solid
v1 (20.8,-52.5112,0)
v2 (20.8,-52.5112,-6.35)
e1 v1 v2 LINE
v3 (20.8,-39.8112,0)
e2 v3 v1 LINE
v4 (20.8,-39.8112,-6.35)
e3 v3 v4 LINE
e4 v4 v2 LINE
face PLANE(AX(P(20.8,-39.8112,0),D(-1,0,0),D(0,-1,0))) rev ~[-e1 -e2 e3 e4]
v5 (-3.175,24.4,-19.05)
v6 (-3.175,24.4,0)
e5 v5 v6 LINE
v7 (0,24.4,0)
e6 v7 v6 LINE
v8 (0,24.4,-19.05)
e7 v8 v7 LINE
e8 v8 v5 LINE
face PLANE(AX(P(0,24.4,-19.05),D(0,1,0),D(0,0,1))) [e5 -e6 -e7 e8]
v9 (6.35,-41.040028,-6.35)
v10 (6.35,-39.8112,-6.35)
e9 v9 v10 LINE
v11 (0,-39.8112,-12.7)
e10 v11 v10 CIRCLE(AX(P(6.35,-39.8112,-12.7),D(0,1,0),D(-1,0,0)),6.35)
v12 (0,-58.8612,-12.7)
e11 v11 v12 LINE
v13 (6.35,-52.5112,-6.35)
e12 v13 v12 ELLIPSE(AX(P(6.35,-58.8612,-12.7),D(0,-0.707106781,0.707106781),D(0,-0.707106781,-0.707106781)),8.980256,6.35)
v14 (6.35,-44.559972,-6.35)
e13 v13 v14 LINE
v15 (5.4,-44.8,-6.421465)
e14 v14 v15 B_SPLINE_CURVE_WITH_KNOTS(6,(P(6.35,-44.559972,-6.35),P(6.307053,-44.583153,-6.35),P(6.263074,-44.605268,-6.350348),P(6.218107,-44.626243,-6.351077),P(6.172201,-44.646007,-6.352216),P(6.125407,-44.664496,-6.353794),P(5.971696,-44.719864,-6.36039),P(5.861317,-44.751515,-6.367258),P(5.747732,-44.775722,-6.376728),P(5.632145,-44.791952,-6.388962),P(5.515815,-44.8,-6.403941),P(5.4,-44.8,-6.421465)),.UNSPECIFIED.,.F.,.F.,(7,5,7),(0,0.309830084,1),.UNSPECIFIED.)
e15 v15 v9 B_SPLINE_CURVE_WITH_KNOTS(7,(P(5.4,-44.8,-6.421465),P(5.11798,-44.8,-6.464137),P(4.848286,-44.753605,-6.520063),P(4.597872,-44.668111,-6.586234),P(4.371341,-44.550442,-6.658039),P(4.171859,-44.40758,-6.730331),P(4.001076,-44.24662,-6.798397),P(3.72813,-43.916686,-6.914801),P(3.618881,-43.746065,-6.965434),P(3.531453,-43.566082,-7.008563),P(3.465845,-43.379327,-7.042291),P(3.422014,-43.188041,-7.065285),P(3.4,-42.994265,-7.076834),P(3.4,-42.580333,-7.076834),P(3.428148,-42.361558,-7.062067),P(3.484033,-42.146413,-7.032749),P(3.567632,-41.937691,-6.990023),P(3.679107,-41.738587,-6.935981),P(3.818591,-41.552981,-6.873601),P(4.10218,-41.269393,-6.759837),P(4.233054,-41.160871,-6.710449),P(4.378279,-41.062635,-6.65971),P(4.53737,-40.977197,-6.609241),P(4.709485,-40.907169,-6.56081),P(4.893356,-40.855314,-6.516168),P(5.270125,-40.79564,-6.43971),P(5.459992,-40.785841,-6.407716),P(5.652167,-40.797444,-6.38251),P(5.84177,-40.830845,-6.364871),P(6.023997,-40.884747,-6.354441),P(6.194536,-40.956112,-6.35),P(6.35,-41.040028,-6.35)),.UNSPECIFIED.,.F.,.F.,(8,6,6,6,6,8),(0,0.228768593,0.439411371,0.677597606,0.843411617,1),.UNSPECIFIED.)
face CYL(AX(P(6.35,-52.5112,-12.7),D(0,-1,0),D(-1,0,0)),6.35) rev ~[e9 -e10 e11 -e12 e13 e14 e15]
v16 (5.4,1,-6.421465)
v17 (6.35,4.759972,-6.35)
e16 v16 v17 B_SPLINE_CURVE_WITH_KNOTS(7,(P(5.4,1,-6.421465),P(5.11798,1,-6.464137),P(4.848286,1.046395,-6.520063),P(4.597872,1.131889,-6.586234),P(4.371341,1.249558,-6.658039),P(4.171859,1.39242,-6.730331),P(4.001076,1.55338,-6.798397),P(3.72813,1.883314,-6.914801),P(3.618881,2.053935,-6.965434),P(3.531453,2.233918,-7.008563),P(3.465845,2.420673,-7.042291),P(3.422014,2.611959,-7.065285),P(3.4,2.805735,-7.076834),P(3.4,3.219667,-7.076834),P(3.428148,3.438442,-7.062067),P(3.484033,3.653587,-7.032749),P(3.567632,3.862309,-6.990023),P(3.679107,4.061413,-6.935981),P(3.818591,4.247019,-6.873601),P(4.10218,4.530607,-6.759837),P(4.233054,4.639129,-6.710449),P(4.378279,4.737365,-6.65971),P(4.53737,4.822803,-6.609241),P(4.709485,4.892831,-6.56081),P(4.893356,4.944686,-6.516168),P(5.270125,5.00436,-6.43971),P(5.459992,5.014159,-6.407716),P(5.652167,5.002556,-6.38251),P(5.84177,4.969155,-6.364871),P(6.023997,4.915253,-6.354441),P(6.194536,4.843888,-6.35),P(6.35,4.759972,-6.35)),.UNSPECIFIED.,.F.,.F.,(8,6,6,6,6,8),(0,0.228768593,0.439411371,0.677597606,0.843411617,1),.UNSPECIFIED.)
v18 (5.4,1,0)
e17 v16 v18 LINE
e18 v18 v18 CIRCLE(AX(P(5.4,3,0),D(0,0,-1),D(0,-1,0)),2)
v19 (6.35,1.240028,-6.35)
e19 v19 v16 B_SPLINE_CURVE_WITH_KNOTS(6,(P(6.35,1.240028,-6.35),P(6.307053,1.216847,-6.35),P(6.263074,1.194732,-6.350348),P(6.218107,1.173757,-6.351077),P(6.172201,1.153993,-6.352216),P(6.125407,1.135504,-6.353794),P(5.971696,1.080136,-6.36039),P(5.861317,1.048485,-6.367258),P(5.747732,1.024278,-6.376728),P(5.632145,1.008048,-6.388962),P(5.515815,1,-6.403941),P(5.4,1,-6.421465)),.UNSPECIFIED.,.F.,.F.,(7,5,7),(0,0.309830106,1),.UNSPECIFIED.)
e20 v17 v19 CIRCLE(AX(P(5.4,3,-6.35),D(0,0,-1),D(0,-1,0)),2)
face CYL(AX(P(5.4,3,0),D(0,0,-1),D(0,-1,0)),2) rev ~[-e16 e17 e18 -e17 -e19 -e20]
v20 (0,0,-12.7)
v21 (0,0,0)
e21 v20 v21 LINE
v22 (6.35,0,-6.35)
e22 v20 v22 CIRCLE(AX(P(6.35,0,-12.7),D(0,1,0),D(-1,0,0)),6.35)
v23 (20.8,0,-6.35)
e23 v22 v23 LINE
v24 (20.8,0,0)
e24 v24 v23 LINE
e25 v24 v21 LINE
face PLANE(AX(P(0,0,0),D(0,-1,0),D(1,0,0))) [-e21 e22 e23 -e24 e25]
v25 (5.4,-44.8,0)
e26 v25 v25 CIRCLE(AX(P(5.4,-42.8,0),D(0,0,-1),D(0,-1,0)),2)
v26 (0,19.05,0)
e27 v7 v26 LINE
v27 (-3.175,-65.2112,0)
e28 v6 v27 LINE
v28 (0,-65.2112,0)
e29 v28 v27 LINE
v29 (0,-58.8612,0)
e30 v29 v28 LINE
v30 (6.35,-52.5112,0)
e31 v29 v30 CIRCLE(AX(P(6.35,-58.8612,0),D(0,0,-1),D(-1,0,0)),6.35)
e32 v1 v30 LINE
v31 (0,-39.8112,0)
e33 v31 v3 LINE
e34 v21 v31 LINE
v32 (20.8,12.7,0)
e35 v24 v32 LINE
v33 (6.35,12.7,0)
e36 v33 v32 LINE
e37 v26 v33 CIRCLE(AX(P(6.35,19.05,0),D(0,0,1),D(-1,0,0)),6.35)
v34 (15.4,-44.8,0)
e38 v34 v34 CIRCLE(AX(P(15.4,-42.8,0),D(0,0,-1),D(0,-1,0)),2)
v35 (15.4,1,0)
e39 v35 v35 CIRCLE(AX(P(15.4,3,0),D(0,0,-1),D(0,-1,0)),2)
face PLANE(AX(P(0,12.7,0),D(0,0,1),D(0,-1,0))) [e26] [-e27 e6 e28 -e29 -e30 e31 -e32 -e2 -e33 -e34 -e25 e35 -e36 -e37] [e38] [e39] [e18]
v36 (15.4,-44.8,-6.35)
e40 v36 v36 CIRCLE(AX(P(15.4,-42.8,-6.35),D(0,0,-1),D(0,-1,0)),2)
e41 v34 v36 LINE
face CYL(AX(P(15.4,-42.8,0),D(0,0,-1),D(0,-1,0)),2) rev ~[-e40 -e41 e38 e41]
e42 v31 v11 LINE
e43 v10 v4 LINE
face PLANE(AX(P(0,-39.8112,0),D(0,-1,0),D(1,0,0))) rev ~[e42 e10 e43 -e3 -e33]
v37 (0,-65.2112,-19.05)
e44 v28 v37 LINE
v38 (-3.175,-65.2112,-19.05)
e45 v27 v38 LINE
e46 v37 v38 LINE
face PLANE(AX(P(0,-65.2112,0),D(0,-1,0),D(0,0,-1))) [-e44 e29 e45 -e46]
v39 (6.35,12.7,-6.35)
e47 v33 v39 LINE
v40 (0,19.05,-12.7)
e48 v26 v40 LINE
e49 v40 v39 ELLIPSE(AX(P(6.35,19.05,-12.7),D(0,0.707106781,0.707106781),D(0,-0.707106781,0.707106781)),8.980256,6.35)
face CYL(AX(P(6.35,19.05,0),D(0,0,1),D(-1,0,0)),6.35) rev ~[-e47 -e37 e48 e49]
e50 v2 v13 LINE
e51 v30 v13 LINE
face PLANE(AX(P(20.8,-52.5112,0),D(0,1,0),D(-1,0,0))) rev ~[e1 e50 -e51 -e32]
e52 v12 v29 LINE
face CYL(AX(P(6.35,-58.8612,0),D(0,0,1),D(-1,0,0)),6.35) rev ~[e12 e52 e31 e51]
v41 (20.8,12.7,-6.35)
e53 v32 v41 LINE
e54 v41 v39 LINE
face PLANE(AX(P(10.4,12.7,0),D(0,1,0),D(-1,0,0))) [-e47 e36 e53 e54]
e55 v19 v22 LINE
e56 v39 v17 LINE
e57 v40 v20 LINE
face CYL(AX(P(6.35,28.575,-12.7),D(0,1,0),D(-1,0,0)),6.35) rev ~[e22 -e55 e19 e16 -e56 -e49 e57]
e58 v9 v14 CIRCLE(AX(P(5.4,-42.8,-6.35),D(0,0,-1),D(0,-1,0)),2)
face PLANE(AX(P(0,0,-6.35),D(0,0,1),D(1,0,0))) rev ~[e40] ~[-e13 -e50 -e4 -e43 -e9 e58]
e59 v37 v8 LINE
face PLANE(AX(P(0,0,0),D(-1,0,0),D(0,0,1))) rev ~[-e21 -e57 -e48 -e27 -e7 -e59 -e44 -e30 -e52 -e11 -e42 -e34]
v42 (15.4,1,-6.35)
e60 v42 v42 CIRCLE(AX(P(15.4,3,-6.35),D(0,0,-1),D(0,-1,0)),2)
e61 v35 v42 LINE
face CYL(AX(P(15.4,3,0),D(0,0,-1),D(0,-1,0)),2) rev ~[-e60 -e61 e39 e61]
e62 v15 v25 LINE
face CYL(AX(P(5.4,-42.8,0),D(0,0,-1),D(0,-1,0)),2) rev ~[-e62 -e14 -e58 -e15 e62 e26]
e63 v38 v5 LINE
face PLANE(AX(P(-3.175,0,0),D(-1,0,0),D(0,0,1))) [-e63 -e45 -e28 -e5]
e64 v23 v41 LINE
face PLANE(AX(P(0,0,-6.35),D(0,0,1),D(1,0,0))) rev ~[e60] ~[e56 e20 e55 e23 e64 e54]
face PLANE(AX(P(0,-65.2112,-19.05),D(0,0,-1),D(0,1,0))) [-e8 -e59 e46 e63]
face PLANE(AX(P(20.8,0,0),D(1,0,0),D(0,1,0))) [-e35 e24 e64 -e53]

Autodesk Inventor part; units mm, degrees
ref_plane "YZ Plane" through (0, 0, 0) normal (1, 0, 0) x (0, 1, 0)
ref_plane "XZ Plane" through (0, 0, 0) normal (0, 1, 0) x (-1, 0, 0)
ref_plane "XY Plane" through (0, 0, 0) normal (0, 0, 1) x (1, 0, 0)
sketch "Sketch1" plane through (0, 0, 0) normal (0, 0, 1) x (1, 0, 0)
  line L0 (0, 0) -> (20.8, 0)
  line L1 (20.8, 0) -> (20.8, 12.7)
  line L2 (20.8, 12.7) -> (0, 12.7)
  line L3 (0, 12.7) -> (0, 0)
  line L4 (0, -39.8112) -> (20.8, -39.8112)
  line L5 (20.8, -39.8112) -> (20.8, -52.5112)
  line L6 (20.8, -52.5112) -> (0, -52.5112)
  line L7 (0, -52.5112) -> (0, -39.8112)
  line L8 (10.4, 12.7) -> (10.4, 0)
  point P0 (5.4, 3)
  dimension "d0" = 20.8
  dimension "d1" = 12.7
  dimension "d2" = 39.8112
  dimension "d33" = 3
  dimension "d34" = 5
  dimension "d41" = 10.4
extrude "Extrusion1" add sketch "Sketch1" against normal blind 6.35
hole "Hole3" at (5.4, 3, 0) direction (0, 0, -1) diameter 4 depth 25.4
pattern_linear "Rectangular Pattern1" count 2 spacing 10 along (1, 0, 0) count 2 spacing 45.8 along (0, -1, 0) of "Hole3"
sketch "Sketch3" plane through (0, 0, 0) normal (-1, 0, 0) x (0, 0, 1)
  line L0 (0, 12.7) -> (0, 0) projected
  line L1 (-19.05, 24.4) -> (0, 24.4)
  line L2 (0, 24.4) -> (0, -65.2112)
  line L3 (0, -65.2112) -> (-19.05, -65.2112)
  line L4 (-19.05, -65.2112) -> (-19.05, 24.4)
  line L5 (0, -39.8112) -> (-6.35, -39.8112) projected
  dimension "d42" = 19.05
  dimension "ServoMountLength" = 89.6112
  dimension "d45" = 25.4
extrude "Extrusion2" add sketch "Sketch3" along normal blind 3.175
fillet "Fillet1" radius 6.35 4 edges at (0, 6.35, -6.35) (0, 12.7, -3.175) (0, -46.1612, -6.35) (0, -52.5112, -3.175)
equation "\"d0\" = ServoWidth + ServoTolerance"
equation "\"d2\" = ServoLength + ServoTolerance"
equation "\"d33\" = ServoScrewOffsetFromSide - 0.5 * ServoTolerance"
equation "\"d34\" = 0.5 * ServoScrewSpacing"
equation "\"d41\" = 0.5 * ServoTolerance + 0.5 * ServoWidth"
equation "\"d37\" = ServoScrewSpacing"
equation "\"d40\" = ServoScrewSpacingLength"
equation "\"ServoTolerance\" = 1"
equation "\"ServoWidth\" = 19.8"
equation "\"ServoLength\" = 38.8112"
equation "\"ServoScrewSpacing\" = 10"
equation "\"ServoScrewSpacingLength\" = 45.8"
equation "\"ServoScrewOffsetFromSide\" = 3.5"
properties part number "ServoMount" material "ABS Plastic"
